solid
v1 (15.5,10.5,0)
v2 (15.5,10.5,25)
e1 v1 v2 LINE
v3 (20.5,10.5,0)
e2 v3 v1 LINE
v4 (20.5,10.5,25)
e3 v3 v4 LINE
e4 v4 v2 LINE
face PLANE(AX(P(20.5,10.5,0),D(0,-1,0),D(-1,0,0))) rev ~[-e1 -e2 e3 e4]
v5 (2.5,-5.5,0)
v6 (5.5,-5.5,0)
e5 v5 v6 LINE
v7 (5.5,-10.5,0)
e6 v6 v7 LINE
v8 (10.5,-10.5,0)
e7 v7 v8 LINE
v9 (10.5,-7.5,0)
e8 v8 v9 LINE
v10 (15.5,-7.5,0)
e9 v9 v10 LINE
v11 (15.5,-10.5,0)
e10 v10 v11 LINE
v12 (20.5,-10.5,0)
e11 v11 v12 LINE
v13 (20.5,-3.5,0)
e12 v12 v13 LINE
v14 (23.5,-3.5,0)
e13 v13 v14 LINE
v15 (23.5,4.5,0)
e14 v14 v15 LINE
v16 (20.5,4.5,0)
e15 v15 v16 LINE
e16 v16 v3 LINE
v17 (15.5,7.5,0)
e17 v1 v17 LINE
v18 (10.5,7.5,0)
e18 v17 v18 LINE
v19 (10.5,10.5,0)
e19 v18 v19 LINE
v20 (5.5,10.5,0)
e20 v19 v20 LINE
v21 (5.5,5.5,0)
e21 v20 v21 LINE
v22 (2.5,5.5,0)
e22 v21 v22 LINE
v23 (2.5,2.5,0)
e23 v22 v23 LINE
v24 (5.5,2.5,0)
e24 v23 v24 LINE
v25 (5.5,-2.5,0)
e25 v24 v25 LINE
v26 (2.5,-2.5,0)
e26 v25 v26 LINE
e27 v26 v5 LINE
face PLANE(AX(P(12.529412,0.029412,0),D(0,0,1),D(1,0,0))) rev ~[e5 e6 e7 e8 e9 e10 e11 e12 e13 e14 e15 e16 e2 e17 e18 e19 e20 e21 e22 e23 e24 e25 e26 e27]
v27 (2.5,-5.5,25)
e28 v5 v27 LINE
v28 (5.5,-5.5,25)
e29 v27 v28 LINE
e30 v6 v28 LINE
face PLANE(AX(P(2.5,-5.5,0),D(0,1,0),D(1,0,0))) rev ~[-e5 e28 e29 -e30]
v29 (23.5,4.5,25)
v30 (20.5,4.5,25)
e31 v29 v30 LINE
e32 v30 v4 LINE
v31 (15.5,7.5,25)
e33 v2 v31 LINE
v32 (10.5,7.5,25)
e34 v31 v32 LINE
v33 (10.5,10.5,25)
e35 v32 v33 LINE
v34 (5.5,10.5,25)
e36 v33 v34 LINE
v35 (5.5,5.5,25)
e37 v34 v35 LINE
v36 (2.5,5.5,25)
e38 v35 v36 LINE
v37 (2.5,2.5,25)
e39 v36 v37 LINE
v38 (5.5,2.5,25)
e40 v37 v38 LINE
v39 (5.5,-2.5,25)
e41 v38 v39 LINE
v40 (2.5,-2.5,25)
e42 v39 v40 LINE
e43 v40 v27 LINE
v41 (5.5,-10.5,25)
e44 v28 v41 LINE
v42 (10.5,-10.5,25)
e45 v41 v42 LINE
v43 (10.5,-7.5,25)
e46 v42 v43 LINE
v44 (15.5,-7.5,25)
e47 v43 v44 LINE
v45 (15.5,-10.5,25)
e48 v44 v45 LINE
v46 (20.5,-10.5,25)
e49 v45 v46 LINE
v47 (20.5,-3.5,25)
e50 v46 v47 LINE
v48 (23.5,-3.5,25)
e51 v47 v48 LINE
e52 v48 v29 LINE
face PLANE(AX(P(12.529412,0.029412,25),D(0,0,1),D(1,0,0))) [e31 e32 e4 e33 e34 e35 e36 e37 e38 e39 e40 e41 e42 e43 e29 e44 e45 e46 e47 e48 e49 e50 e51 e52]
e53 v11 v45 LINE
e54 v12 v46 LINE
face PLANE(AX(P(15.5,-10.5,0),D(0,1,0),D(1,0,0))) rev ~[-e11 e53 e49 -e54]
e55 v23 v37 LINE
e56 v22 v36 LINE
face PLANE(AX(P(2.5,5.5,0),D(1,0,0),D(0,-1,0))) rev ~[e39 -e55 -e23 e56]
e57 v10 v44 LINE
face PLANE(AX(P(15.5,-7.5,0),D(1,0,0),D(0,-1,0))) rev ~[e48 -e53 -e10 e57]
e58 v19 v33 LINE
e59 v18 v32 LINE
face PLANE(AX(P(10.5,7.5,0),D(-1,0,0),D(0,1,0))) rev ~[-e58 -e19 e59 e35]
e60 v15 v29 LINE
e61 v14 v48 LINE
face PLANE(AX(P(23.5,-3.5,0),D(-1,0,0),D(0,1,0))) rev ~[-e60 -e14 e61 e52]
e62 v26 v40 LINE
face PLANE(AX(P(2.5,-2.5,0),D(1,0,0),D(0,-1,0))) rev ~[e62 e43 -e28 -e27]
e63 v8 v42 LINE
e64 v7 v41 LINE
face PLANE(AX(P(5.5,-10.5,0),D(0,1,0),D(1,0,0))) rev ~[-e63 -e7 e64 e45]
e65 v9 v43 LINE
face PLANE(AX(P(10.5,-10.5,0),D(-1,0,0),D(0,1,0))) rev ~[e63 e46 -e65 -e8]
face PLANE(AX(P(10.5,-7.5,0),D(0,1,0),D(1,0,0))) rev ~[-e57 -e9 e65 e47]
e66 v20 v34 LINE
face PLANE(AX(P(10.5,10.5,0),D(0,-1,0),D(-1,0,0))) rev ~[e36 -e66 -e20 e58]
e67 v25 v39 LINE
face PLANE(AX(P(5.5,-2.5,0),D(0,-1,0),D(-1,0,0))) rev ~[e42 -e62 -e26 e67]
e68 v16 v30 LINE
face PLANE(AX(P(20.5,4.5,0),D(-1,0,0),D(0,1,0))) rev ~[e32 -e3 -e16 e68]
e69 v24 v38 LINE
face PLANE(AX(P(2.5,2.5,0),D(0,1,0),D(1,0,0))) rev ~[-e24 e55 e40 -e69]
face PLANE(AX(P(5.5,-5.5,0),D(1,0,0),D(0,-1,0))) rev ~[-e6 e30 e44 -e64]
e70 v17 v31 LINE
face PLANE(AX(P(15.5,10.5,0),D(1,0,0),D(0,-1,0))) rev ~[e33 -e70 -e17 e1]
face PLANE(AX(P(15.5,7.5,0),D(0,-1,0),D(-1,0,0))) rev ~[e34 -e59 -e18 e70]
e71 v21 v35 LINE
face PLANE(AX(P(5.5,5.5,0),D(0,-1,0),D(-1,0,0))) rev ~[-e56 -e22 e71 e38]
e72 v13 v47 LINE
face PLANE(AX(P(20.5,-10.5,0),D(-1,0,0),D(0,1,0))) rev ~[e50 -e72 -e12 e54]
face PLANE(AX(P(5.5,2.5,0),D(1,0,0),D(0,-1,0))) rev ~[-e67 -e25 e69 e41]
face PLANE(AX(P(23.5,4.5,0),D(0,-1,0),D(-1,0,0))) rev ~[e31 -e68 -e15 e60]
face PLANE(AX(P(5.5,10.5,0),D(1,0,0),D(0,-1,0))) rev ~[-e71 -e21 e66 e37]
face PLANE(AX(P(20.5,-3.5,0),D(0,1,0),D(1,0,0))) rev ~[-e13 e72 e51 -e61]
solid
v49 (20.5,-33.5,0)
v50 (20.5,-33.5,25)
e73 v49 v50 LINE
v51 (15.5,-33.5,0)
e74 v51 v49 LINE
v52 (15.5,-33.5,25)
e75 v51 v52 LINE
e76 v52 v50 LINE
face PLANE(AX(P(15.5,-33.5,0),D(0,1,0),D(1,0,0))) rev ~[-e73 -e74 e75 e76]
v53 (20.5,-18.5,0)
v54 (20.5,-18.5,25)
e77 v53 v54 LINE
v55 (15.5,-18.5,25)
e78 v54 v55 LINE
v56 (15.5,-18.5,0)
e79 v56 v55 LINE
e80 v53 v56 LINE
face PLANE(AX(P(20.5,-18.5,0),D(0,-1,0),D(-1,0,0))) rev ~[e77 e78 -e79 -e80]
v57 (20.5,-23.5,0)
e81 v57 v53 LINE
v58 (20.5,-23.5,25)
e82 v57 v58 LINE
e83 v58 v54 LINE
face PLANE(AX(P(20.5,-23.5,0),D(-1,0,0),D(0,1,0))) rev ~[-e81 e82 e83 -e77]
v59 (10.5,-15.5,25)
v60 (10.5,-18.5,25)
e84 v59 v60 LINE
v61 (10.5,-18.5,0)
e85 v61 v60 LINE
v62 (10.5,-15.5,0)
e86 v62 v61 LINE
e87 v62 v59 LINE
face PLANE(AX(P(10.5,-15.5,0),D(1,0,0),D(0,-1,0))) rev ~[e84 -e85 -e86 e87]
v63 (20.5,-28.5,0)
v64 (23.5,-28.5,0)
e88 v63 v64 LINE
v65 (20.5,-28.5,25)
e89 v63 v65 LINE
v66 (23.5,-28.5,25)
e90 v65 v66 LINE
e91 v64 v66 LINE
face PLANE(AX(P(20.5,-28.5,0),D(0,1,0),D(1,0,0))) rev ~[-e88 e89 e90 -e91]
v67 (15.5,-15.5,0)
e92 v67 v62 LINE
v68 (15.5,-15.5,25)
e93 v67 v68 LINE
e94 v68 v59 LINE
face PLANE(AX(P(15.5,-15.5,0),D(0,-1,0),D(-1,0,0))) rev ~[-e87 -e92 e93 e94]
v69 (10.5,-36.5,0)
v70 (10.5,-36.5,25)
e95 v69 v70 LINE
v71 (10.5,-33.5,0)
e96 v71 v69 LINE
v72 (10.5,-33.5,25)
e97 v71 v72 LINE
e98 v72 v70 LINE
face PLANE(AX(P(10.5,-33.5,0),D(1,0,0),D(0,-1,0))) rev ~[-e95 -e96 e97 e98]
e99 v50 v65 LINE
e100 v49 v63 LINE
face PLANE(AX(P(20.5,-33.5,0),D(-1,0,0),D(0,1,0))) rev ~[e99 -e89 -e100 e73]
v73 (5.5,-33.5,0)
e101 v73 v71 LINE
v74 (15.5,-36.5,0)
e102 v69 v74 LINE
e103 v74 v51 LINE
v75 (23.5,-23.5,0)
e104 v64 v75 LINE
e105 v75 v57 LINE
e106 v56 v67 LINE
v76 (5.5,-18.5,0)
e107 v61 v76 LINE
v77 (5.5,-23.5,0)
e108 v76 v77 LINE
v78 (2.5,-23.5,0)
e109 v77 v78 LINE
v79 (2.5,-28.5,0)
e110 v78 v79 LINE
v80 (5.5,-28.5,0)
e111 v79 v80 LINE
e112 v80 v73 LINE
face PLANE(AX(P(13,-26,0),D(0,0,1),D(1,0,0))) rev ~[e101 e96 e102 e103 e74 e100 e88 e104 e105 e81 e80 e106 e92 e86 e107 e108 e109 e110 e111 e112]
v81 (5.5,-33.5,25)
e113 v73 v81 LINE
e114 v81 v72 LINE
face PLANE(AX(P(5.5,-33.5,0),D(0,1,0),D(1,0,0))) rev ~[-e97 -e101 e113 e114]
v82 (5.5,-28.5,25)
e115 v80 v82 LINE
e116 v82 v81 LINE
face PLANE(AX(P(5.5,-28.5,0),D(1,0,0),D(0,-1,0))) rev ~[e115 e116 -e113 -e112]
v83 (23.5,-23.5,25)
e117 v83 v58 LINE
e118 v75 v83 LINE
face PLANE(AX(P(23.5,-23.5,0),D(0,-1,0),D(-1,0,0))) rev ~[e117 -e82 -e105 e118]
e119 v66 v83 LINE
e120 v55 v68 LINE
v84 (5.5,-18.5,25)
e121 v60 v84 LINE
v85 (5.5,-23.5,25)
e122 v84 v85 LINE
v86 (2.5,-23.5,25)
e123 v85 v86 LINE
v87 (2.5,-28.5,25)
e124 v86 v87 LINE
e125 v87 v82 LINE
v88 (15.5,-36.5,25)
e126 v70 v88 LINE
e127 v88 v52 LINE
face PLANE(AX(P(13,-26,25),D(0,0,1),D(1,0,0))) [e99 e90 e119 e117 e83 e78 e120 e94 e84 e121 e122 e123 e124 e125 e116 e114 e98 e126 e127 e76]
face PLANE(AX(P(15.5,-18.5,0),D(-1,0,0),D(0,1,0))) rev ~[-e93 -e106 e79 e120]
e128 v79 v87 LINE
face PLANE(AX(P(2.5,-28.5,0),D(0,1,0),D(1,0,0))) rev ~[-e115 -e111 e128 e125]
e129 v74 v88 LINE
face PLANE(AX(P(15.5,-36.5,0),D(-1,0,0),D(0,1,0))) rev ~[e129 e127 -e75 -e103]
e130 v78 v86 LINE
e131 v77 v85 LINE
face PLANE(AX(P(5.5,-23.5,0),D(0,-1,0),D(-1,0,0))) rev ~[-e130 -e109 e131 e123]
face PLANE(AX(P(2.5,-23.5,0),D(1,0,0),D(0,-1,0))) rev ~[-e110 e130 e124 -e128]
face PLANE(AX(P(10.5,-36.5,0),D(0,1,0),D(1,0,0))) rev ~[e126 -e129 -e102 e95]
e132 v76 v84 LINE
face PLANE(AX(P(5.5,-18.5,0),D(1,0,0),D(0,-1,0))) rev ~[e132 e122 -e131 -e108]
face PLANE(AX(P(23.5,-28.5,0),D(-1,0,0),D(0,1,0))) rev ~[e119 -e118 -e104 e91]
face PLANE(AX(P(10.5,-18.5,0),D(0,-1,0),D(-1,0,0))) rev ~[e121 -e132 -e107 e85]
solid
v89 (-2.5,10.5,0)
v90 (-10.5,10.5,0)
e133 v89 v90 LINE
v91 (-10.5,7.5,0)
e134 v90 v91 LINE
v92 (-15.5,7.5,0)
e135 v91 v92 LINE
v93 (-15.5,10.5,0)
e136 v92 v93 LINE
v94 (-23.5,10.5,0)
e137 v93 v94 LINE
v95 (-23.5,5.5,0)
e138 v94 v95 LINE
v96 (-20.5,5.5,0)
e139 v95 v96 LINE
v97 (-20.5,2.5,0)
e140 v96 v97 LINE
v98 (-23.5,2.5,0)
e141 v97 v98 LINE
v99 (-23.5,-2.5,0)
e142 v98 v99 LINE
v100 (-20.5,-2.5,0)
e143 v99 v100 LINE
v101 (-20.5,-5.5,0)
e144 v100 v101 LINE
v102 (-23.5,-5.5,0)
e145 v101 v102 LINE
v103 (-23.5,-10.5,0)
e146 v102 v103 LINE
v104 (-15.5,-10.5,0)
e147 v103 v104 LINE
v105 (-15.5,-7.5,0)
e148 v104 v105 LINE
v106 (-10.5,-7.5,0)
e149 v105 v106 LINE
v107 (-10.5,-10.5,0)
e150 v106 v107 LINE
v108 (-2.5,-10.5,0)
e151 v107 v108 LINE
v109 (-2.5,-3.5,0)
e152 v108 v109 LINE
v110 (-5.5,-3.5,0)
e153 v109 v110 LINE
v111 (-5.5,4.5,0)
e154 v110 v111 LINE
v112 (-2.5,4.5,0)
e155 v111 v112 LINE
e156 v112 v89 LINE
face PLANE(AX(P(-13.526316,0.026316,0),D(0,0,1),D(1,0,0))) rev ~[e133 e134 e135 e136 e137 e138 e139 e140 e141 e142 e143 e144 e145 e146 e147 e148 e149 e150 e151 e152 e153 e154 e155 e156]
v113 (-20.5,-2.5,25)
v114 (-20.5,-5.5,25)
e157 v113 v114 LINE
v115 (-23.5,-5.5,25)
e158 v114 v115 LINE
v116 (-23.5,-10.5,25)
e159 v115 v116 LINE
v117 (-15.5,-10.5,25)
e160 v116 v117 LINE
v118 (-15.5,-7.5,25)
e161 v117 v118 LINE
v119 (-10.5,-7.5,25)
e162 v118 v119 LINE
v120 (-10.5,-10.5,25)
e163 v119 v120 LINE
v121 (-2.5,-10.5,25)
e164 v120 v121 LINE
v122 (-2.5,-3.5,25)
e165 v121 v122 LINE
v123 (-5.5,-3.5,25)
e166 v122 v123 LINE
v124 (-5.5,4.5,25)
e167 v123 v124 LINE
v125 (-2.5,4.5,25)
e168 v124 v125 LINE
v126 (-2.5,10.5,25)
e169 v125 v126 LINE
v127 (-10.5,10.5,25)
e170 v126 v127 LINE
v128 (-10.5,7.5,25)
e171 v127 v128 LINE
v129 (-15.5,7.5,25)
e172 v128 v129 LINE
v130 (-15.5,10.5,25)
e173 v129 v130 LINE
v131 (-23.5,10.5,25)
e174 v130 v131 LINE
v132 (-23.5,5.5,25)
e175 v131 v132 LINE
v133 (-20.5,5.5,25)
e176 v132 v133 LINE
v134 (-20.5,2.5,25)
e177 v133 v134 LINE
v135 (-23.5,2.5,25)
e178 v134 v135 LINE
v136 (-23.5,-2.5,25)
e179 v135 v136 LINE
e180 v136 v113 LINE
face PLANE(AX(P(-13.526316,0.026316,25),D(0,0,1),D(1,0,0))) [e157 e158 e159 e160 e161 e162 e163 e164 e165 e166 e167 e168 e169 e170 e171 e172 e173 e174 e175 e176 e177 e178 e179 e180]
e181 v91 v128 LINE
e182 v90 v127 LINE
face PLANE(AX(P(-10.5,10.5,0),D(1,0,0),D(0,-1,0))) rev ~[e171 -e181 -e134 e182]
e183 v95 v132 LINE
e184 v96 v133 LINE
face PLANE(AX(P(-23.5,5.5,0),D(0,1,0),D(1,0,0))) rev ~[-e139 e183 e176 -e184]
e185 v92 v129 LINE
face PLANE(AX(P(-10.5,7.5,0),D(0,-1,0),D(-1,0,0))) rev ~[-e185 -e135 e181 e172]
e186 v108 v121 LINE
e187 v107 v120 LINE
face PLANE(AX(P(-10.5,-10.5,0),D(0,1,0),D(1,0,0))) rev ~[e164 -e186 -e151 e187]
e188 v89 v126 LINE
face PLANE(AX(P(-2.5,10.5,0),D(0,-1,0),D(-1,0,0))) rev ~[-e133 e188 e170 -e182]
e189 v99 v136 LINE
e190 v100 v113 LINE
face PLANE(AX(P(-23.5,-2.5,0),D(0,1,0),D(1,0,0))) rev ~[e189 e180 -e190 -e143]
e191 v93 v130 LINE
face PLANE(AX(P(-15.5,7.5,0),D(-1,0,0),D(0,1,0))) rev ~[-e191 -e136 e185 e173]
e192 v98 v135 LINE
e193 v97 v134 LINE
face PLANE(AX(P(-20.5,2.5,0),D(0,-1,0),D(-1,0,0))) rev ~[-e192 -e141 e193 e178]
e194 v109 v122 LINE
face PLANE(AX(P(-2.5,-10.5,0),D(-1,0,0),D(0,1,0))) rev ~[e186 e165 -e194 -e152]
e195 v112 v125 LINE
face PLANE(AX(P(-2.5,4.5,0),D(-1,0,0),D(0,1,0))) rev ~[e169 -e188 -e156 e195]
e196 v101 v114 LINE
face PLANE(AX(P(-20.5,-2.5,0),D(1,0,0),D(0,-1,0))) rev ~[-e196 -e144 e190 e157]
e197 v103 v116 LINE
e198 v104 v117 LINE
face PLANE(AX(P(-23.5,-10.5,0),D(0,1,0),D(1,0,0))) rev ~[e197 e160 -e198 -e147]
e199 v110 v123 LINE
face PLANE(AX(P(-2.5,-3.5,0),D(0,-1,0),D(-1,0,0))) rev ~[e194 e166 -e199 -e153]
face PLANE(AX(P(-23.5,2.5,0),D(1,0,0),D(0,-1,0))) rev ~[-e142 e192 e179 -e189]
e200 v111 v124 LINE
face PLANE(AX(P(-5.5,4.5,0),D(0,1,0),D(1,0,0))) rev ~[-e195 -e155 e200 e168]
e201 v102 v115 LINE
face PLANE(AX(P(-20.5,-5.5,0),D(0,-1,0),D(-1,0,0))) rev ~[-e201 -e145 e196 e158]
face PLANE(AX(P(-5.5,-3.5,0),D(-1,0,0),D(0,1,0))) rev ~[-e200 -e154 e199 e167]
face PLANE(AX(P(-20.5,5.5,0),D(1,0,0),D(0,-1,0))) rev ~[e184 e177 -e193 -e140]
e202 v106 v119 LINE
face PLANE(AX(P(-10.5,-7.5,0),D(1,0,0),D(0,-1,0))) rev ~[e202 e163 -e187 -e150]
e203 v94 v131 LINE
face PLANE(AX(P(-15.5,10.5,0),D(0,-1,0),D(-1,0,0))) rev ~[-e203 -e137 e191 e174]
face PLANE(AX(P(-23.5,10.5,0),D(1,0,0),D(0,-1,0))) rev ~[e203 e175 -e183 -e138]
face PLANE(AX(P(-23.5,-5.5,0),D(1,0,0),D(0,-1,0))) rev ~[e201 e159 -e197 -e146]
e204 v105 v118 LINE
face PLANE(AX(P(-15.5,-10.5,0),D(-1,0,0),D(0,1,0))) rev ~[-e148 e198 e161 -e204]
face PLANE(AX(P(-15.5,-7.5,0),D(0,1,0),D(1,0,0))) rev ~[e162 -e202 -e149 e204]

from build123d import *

# Parameters (mm, degrees)
F1_DEPTH = 25


# Not quite as in the source:
# - a feature names something its author has since deleted; it is built from what else it names


with BuildPart() as f1:
    # F0 (on Top) → F1 (new body)
    with BuildSketch(Plane.XY):
        Polygon((10.5, 10.5), (5.5, 10.5), (5.5, 5.5), (2.5, 5.5), (2.5, 2.5), (5.5, 2.5), (5.5, -2.5), (2.5, -2.5), (2.5, -5.5), (5.5, -5.5), (5.5, -10.5), (10.5, -10.5), (10.5, -7.5), (15.5, -7.5), (15.5, -10.5), (20.5, -10.5), (20.5, -3.5), (23.5, -3.5), (23.5, 4.5), (20.5, 4.5), (20.5, 10.5), (15.5, 10.5), (15.5, 7.5), (10.5, 7.5), align=None)
    extrude(amount=F1_DEPTH)


with BuildPart() as f1b:
    # F0 (on Top) → F1, piece 2 (new body)
    with BuildSketch(Plane.XY):
        Polygon((-15.5, 10.5), (-23.5, 10.5), (-23.5, 5.5), (-20.5, 5.5), (-20.5, 2.5), (-23.5, 2.5), (-23.5, -2.5), (-20.5, -2.5), (-20.5, -5.5), (-23.5, -5.5), (-23.5, -10.5), (-15.5, -10.5), (-15.5, -7.5), (-10.5, -7.5), (-10.5, -10.5), (-2.5, -10.5), (-2.5, -3.5), (-5.5, -3.5), (-5.5, 4.5), (-2.5, 4.5), (-2.5, 10.5), (-10.5, 10.5), (-10.5, 7.5), (-15.5, 7.5), align=None)
    extrude(amount=F1_DEPTH)


with BuildPart() as f1c:
    # F0 (on Top) → F1, piece 3 (new body)
    with BuildSketch(Plane.XY):
        Polygon((10.5, -18.5), (5.5, -18.5), (5.5, -23.5), (2.5, -23.5), (2.5, -28.5), (5.5, -28.5), (5.5, -33.5), (10.5, -33.5), (10.5, -36.5), (15.5, -36.5), (15.5, -33.5), (20.5, -33.5), (20.5, -28.5), (23.5, -28.5), (23.5, -23.5), (20.5, -23.5), (20.5, -18.5), (15.5, -18.5), (15.5, -15.5), (10.5, -15.5), align=None)
    extrude(amount=F1_DEPTH)


solid = Compound([f1.part, f1b.part, f1c.part])
